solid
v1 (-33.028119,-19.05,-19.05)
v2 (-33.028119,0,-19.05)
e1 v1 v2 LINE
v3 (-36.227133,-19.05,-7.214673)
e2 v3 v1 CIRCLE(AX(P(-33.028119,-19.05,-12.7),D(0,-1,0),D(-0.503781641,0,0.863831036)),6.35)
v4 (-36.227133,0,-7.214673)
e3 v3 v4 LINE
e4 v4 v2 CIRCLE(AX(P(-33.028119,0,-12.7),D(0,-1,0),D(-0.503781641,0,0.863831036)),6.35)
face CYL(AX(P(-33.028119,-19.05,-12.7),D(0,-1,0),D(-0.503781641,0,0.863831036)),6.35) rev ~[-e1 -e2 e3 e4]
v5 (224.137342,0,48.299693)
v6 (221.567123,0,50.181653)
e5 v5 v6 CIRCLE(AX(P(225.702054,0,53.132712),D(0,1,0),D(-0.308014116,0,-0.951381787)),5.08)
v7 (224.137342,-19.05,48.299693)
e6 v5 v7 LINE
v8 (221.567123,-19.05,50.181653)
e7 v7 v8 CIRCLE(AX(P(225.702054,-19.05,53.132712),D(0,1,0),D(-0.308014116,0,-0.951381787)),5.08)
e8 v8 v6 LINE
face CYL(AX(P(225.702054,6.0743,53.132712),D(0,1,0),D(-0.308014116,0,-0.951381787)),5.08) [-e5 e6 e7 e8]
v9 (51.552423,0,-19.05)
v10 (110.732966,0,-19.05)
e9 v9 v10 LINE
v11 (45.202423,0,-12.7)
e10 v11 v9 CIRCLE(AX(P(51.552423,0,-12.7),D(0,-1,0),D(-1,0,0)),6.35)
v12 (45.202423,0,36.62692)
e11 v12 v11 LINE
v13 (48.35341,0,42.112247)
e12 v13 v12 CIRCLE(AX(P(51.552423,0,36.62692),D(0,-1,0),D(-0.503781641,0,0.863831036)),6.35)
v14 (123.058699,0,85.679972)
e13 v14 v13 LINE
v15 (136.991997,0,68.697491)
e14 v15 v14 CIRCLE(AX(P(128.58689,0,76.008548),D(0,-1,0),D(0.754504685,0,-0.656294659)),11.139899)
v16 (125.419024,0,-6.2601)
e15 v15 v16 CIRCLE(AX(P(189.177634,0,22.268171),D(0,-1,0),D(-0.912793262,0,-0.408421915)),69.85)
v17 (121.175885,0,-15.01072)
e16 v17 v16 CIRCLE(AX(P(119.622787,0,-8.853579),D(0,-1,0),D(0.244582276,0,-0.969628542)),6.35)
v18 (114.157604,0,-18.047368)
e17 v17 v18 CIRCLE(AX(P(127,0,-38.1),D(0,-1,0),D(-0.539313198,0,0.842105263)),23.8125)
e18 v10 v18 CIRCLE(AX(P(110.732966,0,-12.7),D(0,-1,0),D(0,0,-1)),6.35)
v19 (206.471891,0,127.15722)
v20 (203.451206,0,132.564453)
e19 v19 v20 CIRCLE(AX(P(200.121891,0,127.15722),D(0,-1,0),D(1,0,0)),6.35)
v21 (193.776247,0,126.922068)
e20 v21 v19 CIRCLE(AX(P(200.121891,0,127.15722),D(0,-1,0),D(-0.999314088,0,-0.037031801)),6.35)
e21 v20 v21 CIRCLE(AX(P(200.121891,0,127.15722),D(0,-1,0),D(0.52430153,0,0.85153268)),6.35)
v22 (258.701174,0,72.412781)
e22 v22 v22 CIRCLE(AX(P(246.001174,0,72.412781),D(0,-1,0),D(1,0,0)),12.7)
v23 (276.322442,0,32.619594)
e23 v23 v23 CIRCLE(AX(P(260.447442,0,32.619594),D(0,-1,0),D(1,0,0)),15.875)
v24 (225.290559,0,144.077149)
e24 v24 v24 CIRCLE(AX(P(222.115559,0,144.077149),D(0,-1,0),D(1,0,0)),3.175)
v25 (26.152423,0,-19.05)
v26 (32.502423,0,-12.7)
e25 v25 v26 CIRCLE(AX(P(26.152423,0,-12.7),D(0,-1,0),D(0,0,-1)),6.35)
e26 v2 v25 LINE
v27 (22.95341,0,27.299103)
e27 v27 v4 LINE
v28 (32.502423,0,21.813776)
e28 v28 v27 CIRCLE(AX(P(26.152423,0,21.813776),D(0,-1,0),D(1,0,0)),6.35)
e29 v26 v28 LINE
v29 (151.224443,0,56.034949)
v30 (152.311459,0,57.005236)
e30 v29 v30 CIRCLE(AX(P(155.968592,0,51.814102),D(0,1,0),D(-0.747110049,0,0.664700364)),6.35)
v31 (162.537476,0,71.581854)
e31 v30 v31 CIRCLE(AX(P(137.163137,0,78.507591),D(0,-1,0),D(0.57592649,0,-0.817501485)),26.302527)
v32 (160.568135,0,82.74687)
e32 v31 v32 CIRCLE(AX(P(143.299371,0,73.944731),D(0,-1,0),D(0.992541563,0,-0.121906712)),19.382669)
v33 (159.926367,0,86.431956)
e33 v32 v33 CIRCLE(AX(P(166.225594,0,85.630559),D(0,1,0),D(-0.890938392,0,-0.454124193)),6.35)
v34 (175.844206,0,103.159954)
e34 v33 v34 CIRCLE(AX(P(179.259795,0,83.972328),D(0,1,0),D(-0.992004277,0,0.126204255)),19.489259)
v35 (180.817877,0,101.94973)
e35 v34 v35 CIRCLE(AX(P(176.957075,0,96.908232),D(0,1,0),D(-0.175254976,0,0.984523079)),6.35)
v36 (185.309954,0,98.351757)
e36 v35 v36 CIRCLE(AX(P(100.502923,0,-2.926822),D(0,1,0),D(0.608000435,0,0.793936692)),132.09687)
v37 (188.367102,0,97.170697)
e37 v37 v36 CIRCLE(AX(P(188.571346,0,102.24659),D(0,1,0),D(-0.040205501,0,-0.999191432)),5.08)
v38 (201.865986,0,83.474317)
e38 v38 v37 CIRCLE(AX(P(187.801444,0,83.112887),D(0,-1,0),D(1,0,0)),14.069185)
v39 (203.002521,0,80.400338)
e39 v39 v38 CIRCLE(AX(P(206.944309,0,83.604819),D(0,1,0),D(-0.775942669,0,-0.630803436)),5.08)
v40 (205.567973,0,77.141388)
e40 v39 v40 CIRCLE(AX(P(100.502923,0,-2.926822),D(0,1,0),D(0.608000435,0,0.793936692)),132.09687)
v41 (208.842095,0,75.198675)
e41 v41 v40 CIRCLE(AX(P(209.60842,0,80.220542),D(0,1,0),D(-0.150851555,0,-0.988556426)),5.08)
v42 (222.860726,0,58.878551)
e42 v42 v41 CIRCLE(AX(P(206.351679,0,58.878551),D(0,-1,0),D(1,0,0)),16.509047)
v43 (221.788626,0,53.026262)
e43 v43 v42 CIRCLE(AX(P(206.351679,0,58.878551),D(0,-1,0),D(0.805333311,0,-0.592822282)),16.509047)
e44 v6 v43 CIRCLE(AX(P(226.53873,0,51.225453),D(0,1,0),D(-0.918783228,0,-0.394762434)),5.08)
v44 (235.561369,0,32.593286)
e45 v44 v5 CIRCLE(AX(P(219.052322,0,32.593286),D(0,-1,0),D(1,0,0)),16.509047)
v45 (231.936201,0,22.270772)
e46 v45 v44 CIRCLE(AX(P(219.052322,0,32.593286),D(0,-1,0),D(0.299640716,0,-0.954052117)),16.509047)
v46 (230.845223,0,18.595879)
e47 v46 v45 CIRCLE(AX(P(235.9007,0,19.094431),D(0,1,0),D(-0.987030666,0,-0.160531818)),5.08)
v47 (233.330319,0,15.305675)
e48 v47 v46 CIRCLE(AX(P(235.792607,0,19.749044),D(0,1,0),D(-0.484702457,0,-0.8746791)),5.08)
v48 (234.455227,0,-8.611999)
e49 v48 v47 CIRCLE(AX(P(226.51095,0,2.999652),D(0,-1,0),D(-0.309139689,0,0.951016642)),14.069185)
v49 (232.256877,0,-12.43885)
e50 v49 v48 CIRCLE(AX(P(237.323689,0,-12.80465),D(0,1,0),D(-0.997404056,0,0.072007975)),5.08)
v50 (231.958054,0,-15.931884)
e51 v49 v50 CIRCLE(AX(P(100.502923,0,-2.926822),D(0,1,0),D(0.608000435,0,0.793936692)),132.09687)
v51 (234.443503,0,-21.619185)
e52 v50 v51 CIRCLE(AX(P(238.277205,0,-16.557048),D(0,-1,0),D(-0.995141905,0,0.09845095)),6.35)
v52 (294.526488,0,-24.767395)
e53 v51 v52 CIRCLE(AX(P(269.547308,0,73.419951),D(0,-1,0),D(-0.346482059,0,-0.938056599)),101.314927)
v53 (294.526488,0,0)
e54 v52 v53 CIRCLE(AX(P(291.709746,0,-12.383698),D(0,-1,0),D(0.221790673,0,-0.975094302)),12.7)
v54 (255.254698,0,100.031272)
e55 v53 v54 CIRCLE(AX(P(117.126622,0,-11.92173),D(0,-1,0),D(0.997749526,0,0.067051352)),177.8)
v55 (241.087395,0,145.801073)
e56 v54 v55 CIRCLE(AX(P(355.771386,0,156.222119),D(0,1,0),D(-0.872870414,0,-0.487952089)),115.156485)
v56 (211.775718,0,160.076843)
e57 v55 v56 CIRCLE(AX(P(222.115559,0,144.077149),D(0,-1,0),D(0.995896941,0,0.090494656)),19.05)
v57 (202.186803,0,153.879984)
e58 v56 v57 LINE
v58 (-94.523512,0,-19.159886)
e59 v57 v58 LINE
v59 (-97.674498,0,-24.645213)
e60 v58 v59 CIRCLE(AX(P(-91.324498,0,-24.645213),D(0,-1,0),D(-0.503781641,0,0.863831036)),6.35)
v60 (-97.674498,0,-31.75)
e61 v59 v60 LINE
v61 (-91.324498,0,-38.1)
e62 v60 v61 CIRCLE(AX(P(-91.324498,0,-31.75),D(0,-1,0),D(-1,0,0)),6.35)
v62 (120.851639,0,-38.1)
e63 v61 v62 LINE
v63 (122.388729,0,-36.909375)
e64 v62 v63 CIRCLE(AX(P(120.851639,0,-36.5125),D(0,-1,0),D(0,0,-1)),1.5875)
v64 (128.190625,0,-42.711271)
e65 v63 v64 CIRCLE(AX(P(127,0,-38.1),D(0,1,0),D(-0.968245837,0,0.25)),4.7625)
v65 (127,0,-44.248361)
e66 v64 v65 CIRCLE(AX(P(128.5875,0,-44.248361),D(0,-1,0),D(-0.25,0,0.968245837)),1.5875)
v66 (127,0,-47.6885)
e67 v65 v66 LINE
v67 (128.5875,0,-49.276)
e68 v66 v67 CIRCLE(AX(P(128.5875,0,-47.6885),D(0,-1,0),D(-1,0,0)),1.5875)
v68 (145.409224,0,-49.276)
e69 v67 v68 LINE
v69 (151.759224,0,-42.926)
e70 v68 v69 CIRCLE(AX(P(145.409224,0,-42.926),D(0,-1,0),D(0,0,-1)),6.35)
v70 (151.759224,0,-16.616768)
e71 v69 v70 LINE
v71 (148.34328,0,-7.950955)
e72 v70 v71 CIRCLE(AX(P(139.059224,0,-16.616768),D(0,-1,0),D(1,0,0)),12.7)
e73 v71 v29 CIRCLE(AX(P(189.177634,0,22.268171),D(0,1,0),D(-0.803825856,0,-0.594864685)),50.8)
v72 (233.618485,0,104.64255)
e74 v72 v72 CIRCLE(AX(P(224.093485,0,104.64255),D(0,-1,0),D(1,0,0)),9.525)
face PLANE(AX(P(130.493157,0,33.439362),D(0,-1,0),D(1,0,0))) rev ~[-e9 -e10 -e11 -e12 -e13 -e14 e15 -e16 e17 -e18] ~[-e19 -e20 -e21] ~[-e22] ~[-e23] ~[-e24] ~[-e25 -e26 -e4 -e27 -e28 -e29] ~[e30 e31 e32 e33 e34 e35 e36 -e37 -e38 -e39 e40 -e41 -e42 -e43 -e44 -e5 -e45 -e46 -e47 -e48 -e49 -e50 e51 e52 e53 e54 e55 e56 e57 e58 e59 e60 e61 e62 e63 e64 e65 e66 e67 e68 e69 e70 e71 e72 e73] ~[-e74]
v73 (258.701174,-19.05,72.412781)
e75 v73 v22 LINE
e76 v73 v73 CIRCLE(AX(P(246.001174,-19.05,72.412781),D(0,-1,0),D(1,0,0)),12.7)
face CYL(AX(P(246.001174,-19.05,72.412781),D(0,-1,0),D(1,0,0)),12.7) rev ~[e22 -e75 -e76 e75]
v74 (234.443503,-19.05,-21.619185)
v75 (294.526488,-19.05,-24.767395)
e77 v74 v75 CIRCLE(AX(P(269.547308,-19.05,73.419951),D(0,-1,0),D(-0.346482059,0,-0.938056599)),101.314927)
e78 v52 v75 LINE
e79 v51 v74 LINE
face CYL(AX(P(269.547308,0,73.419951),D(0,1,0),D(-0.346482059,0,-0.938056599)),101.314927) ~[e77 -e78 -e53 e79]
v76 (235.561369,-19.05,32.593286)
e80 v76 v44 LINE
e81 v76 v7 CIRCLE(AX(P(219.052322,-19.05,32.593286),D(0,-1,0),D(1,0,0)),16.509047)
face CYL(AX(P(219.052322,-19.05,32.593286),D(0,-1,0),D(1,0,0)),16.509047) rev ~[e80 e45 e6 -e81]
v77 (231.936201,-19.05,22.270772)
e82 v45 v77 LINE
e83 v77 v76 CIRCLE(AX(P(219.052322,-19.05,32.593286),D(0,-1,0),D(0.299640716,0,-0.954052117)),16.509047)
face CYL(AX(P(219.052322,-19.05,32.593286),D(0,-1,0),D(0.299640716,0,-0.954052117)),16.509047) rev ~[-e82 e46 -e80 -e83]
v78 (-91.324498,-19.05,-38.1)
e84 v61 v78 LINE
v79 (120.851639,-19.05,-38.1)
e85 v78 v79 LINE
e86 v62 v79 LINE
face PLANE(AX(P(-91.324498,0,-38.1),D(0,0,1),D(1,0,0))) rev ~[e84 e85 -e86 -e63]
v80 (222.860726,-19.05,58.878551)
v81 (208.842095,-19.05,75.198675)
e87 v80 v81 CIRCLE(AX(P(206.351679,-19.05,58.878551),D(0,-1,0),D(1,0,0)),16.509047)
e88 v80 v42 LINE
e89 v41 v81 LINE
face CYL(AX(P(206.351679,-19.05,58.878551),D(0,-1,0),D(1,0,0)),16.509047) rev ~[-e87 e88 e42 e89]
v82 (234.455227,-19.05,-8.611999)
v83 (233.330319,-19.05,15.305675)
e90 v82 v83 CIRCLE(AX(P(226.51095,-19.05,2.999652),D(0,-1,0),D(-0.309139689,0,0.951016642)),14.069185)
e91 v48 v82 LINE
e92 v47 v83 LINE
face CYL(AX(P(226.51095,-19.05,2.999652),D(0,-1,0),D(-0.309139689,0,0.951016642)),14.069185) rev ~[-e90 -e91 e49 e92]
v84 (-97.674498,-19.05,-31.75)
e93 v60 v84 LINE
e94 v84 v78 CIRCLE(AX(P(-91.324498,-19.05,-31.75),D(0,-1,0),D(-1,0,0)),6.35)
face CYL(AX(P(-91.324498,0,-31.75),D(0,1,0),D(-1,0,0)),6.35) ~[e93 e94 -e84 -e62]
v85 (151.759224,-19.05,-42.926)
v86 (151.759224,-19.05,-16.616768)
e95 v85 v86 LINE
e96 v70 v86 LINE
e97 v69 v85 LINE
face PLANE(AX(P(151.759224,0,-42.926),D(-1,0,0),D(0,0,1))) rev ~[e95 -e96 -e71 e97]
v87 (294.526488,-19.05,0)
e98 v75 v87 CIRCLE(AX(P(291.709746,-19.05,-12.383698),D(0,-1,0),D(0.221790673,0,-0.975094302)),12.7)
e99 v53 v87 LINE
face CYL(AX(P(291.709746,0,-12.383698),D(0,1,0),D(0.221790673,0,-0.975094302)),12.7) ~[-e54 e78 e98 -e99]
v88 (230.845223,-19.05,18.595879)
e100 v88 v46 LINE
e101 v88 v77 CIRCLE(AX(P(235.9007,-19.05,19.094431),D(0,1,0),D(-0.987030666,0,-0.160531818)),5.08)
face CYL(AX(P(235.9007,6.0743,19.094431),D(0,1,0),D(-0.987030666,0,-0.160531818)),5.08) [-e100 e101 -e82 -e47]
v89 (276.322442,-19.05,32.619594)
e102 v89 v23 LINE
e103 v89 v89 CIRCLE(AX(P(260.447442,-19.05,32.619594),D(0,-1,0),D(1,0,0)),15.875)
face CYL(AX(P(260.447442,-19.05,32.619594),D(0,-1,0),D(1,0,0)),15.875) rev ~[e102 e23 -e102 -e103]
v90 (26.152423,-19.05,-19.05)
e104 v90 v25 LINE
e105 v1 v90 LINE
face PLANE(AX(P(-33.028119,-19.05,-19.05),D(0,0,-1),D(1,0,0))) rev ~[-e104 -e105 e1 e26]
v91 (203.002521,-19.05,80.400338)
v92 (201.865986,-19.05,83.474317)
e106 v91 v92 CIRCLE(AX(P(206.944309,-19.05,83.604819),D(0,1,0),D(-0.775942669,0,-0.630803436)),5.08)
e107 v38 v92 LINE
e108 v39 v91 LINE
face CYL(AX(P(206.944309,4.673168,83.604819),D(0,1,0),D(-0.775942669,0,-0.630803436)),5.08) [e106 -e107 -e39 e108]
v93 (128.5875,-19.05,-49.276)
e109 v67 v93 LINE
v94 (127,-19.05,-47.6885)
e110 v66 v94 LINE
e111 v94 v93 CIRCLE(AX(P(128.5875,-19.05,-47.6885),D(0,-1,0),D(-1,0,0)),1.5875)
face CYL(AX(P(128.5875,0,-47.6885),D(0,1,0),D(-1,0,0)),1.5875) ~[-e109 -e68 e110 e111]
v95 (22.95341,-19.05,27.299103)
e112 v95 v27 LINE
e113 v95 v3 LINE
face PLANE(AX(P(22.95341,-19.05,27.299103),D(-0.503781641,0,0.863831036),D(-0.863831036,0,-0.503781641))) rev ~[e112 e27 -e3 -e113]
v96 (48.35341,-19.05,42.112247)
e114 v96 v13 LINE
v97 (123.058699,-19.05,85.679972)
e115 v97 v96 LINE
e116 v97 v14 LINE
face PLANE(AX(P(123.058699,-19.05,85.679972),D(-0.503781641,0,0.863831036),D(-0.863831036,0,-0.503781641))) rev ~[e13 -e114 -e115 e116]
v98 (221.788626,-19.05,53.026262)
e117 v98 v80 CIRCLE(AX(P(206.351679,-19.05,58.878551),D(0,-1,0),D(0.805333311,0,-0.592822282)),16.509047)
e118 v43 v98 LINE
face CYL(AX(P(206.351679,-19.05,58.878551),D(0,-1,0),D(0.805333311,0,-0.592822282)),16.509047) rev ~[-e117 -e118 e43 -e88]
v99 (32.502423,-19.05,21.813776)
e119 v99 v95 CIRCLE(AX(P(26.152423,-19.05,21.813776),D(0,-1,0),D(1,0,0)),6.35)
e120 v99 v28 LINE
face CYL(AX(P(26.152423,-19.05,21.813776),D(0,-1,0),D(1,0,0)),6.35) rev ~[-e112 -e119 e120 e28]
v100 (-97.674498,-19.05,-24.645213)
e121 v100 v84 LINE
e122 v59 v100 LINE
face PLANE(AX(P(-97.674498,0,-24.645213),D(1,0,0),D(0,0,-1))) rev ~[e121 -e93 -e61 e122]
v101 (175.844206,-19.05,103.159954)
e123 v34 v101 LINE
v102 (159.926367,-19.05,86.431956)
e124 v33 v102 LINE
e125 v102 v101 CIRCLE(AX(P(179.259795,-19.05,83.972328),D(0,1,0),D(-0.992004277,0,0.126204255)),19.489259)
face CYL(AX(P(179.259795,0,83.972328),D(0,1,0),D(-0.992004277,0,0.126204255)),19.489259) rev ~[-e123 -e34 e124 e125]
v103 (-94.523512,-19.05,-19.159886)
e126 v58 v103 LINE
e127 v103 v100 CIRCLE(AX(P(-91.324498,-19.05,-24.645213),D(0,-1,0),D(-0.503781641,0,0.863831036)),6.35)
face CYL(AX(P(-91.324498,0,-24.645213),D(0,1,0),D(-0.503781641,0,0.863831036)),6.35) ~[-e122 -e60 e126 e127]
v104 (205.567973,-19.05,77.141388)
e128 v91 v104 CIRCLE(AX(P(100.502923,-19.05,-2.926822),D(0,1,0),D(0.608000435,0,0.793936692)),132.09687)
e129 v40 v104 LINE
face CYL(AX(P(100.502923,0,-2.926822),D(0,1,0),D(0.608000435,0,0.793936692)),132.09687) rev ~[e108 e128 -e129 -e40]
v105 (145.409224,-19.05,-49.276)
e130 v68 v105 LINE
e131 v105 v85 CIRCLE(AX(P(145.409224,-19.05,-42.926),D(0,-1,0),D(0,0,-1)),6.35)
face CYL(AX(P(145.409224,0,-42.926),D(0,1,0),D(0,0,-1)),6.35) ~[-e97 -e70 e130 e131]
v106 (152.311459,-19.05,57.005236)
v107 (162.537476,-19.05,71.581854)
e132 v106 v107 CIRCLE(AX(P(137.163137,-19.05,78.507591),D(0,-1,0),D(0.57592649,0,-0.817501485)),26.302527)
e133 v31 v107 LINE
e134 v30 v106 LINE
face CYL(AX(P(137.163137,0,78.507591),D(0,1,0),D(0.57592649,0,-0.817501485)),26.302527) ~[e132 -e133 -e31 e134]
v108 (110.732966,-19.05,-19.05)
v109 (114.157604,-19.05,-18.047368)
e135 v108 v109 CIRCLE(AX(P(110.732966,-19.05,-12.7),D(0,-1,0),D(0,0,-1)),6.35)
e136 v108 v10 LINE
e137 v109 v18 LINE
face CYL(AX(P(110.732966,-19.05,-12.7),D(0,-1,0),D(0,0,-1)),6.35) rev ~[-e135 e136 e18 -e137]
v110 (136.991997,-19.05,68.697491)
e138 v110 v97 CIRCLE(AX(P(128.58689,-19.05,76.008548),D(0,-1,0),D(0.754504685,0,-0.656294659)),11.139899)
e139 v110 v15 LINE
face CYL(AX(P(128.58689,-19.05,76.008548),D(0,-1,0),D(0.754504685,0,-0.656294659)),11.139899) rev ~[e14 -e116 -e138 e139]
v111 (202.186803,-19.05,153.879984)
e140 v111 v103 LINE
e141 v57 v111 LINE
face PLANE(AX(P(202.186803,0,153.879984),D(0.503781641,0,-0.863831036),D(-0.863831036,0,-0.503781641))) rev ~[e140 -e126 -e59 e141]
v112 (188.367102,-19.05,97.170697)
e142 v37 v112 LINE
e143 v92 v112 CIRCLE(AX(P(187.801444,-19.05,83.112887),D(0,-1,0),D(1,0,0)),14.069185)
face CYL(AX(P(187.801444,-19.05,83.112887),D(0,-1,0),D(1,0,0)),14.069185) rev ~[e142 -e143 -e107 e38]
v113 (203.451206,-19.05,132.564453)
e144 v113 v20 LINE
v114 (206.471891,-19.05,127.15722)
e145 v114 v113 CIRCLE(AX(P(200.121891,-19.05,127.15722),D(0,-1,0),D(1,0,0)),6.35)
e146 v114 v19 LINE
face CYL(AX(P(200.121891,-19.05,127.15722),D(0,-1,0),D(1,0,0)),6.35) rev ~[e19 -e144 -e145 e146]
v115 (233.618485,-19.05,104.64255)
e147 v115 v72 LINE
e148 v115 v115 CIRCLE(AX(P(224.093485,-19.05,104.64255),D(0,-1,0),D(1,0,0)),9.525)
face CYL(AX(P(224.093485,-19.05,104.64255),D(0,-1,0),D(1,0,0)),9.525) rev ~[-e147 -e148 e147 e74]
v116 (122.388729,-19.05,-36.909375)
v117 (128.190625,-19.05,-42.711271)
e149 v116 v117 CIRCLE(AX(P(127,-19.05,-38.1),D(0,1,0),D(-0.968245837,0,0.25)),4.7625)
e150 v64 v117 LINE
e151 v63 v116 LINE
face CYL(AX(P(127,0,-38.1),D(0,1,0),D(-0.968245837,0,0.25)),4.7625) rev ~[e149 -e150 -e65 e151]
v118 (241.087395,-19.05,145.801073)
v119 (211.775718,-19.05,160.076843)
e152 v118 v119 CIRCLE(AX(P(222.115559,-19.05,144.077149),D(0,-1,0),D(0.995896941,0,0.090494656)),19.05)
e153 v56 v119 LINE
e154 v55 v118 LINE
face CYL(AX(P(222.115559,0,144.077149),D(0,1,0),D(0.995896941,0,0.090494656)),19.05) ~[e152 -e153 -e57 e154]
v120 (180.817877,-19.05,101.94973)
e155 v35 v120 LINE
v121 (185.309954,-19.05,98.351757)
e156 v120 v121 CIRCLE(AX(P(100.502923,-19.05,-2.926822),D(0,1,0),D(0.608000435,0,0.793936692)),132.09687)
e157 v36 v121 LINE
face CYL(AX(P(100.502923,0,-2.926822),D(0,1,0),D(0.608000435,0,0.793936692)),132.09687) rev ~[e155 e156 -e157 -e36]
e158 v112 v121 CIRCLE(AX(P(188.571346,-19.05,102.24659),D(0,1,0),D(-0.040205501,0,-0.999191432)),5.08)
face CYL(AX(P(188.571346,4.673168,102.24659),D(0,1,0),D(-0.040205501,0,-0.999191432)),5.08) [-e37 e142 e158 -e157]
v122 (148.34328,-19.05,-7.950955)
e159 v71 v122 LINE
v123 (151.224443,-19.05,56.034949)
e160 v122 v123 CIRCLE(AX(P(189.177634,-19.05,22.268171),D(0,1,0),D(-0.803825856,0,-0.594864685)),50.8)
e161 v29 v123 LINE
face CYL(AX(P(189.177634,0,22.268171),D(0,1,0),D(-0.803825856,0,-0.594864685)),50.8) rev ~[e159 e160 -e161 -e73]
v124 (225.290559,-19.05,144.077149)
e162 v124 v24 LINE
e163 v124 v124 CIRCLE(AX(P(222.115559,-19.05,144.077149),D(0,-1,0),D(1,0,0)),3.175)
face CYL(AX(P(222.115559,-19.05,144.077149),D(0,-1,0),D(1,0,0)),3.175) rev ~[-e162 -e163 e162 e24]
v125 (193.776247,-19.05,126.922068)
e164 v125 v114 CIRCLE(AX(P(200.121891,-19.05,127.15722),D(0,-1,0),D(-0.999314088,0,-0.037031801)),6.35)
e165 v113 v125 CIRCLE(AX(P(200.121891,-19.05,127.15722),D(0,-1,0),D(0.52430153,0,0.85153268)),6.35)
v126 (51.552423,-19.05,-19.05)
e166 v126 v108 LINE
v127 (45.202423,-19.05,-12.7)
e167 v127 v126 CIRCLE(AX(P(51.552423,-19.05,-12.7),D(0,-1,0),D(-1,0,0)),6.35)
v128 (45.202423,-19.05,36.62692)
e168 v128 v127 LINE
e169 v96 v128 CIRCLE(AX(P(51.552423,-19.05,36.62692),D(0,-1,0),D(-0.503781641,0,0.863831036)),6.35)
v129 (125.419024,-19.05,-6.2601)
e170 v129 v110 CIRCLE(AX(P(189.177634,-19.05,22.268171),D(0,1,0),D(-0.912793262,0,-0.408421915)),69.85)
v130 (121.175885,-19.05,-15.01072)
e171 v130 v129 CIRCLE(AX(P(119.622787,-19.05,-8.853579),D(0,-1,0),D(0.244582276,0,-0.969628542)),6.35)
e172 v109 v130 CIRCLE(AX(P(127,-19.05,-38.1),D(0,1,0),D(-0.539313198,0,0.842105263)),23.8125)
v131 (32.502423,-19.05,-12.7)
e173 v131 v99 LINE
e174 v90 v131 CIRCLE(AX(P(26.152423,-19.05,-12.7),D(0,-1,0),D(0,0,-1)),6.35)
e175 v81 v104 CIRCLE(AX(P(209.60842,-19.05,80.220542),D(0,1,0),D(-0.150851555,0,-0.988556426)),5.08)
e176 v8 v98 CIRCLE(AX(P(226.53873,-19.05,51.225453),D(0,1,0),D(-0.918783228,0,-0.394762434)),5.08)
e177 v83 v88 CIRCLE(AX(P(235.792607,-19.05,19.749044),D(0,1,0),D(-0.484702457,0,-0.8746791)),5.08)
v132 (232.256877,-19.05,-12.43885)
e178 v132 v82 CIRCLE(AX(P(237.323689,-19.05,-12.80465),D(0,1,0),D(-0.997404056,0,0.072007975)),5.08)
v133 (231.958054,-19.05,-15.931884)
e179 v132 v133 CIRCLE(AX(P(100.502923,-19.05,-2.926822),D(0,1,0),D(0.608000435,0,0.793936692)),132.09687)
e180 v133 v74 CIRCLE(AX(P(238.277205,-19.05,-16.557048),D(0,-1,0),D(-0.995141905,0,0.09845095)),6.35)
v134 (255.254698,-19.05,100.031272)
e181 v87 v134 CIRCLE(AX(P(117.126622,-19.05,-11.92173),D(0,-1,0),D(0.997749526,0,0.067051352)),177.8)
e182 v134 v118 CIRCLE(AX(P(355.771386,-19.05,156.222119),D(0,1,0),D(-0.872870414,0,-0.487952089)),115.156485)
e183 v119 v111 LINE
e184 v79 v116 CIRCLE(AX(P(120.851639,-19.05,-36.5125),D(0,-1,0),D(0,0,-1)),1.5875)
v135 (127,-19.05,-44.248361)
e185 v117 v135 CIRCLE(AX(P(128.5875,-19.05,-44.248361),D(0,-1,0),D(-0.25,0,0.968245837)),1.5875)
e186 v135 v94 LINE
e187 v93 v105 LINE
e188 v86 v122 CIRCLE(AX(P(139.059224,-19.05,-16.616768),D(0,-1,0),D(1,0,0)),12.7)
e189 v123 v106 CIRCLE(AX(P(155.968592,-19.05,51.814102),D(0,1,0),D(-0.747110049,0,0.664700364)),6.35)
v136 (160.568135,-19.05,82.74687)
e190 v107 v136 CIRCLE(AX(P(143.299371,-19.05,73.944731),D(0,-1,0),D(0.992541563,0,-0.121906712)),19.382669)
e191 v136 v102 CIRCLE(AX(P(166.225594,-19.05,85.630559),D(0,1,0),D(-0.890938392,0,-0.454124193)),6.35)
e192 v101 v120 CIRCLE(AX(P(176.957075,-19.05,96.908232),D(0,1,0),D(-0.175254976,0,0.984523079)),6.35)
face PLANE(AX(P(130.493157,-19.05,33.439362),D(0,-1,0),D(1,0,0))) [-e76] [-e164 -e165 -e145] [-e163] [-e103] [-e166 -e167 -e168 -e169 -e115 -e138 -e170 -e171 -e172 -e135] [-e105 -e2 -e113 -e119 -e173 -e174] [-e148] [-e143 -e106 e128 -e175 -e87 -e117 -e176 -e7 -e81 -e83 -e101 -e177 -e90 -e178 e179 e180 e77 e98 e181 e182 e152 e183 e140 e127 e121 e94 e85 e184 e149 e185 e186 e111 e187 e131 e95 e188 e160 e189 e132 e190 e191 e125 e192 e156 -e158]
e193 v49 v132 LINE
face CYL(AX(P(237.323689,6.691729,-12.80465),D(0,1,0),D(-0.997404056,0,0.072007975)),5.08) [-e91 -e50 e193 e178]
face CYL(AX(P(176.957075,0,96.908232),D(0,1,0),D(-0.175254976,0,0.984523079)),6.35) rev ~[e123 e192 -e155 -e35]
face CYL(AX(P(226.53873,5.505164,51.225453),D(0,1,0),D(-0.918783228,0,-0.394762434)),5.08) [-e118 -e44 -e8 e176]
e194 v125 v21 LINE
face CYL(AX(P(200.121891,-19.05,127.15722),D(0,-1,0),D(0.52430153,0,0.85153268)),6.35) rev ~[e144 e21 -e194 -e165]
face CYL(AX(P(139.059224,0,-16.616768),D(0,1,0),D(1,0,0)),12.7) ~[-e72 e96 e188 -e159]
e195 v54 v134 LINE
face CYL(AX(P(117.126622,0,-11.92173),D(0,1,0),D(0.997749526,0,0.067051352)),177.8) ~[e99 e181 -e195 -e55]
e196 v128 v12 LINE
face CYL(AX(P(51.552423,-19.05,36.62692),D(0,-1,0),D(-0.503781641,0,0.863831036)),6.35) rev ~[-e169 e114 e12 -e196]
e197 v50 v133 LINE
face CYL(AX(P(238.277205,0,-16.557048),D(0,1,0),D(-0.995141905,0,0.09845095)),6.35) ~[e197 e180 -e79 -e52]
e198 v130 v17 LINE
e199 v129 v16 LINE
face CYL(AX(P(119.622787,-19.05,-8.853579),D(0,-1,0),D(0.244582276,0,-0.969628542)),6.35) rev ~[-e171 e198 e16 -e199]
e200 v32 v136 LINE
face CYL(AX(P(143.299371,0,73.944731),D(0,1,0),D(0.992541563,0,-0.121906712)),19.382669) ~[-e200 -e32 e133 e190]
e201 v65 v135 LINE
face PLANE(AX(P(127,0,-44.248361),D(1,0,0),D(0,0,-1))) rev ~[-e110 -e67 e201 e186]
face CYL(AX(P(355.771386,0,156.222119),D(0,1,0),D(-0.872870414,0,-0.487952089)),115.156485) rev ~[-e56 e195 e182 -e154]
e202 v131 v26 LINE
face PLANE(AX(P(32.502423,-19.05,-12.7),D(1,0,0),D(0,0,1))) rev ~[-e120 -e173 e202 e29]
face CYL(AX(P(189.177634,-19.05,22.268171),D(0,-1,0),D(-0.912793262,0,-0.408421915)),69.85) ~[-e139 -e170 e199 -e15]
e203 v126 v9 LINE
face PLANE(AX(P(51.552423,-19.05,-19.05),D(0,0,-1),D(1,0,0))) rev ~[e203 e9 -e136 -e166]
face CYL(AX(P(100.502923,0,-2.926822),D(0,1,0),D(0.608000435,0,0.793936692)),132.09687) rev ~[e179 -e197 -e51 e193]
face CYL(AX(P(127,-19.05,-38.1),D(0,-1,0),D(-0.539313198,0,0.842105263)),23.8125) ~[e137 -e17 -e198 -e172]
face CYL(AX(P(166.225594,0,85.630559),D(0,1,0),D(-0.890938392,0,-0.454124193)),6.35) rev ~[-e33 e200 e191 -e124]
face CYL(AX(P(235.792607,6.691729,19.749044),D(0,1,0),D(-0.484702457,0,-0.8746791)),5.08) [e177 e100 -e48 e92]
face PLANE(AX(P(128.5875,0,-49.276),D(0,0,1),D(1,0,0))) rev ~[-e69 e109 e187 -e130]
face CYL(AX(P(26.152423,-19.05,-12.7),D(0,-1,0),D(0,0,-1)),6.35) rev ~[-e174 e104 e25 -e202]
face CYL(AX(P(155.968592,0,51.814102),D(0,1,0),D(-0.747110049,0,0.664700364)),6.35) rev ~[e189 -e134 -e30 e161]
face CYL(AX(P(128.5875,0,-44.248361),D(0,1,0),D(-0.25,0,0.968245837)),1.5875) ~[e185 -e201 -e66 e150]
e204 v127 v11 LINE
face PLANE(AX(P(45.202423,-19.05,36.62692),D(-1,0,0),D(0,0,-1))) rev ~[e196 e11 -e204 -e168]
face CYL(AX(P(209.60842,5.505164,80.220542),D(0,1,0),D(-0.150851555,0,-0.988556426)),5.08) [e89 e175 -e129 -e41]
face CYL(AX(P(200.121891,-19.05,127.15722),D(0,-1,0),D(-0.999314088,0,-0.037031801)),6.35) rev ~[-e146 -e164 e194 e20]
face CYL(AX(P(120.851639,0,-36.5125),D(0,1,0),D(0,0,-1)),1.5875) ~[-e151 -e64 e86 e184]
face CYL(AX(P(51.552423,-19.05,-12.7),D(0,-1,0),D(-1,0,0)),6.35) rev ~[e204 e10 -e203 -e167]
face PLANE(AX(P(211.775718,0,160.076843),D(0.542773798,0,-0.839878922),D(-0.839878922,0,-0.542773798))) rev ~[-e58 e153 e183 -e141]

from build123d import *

# Parameters (mm, degrees)
F1_DEPTH    = 19.05
F2_R        = 3.175
F2_R_2      = 9.525
F2_R_3      = 12.7
F2_R_4      = 15.875
F3_DEPTH    = 25.4
F5_DEPTH    = 25.4
F6_T1_DEPTH = 30.0603271211
F6_T3_DEPTH = 31.1986000008
F6_T5_DEPTH = 28.3963352446
F6_T7_DEPTH = 32.4334586234


# Not quite as in the source:
# - a fillet or chamfer that OpenCascade refuses, or shapes differently, is made with other operations: its cross-section is extruded or revolved along the edge and cut away or added


with BuildPart() as f1:
    # F0 (on Front) → F1 (new body)
    with BuildSketch(Plane.XZ):
        with BuildLine():
            ThreePointArc((-97.6744983316, -31.75), (-95.8146263921, -36.2401280605), (-91.3244983316, -38.1))
            Line((-91.3244983316, -38.1), (120.8516389379, -38.1))
            ThreePointArc((120.8516389379, -38.1), (121.8237801796, -37.7675289464), (122.3887292034, -36.909375))
            ThreePointArc((122.3887292034, -36.909375), (130.3675960454, -34.7324039546), (128.190625, -42.7112707966))
            ThreePointArc((128.190625, -42.7112707966), (127.3324710536, -43.2762198204), (127, -44.2483610621))
            Line((127, -44.2483610621), (127, -47.6885))
            ThreePointArc((127, -47.6885), (127.4649679849, -48.8110320151), (128.5875, -49.276))
            Line((128.5875, -49.276), (145.4092243424, -49.276))
            ThreePointArc((145.4092243424, -49.276), (149.8993524029, -47.4161280605), (151.7592243424, -42.926))
            Line((151.7592243424, -42.926), (151.7592243424, -16.6167677244))
            ThreePointArc((151.7592243424, -16.6167677244), (150.8744160327, -11.9593816205), (148.3432801973, -7.95095519))
            ThreePointArc((148.3432801973, -7.95095519), (138.4290547294, 24.5532823111), (151.2244431733, 56.0349493051))
            ThreePointArc((151.2244431733, 56.0349493051), (151.7400284969, 56.5513745002), (152.3114587754, 57.0052364228))
            ThreePointArc((152.3114587754, 57.0052364228), (158.6954603174, 63.4018980936), (162.5374758377, 71.5818536535))
            ThreePointArc((162.5374758377, 71.5818536535), (162.3873847727, 77.3115690897), (160.5681351866, 82.7468701164))
            ThreePointArc((160.5681351866, 82.7468701164), (159.9697528023, 84.5410858194), (159.9263668127, 86.4319557574))
            ThreePointArc((159.9263668127, 86.4319557574), (165.1411573537, 97.4071817121), (175.8442055157, 103.1599536687))
            ThreePointArc((175.8442055157, 103.1599536687), (178.4583890799, 103.0782041484), (180.8178773791, 101.9497301092))
            ThreePointArc((180.8178773791, 101.9497301092), (221.6873319491, 49.6461946462), (231.9580536588, -15.9318841175))
            ThreePointArc((231.9580536588, -15.9318841175), (232.4585750307, -19.0998901862), (234.443503066, -21.6191846886))
            ThreePointArc((234.443503066, -21.6191846886), (264.2459103293, -27.7561805118), (294.5264875889, -24.767395266))
            ThreePointArc((294.5264875889, -24.767395266), (304.4097460434, -12.383697633), (294.5264875889, 0))
            ThreePointArc((294.5264875889, 0), (282.6289913598, 53.0536935026), (255.2546977003, 100.031271744))
            ThreePointArc((255.2546977003, 100.031271744), (245.7643329114, 122.1712128334), (241.0873952711, 145.8010725364))
            ThreePointArc((241.0873952711, 145.8010725364), (230.45685595, 161.2038903493), (211.7757176902, 160.0768428105))
            Line((211.7757176902, 160.0768428105), (202.1868032782, 153.8799835291))
            Line((202.1868032782, 153.8799835291), (-94.5235117526, -19.159885704))
            ThreePointArc((-94.5235117526, -19.159885704), (-96.8306873596, -21.4822422795), (-97.6744983316, -24.6452127802))
            Line((-97.6744983316, -24.6452127802), (-97.6744983316, -31.75))
        make_face()
    extrude(amount=F1_DEPTH)

    # F2 (on face) → F3 (cut)
    with BuildSketch(Plane.XZ.offset(19.05)):
        with Locations((222.1155585436, 144.0771493407)):
            Circle(F2_R)
        with BuildLine():
            Line((203.4512059186, 132.5644525933), (193.776246746, 126.9220681353))
            ThreePointArc((193.776246746, 126.9220681353), (200.2394873385, 120.8083090531), (206.4718912023, 127.1572200738))
            ThreePointArc((206.4718912023, 127.1572200738), (205.6655203588, 130.254101695), (203.4512059186, 132.5644525933))
        make_face()
        with BuildLine():
            ThreePointArc((203.4512059186, 132.5644525933), (196.9228777813, 132.6425471499), (193.776246746, 126.9220681353))
            Line((193.776246746, 126.9220681353), (203.4512059186, 132.5644525933))
        make_face()
        with Locations((224.0934852203, 104.6425497844)):
            Circle(F2_R_2)
        with Locations((246.0011737906, 72.412781237)):
            Circle(F2_R_3)
        with Locations((260.4474416869, 32.6195944174)):
            Circle(F2_R_4)
        with BuildLine():
            ThreePointArc((-36.2271326674, -7.2146729239), (-39.1581407363, -14.3569057105), (-33.0281192464, -19.05))
            Line((-33.0281192464, -19.05), (26.1524232063, -19.05))
            ThreePointArc((26.1524232063, -19.05), (30.6425512669, -17.1901280605), (32.5024232063, -12.7))
            Line((32.5024232063, -12.7), (32.5024232063, 21.8137759235))
            ThreePointArc((32.5024232063, 21.8137759235), (29.315393707, 27.3199649515), (22.9534097853, 27.2991029996))
            Line((22.9534097853, 27.2991029996), (-36.2271326674, -7.2146729239))
        make_face()
        with BuildLine():
            ThreePointArc((125.4190243086, -6.2600999334), (120.1455601031, 32.9262812272), (136.9919967338, 68.6974912436))
            ThreePointArc((136.9919967338, 68.6974912436), (137.1991099249, 83.0744541178), (123.0586985781, 85.6799721664))
            Line((123.0586985781, 85.6799721664), (48.3534097853, 42.1122471873))
            ThreePointArc((48.3534097853, 42.1122471873), (46.0462341784, 39.7898906118), (45.2024232063, 36.6269201112))
            Line((45.2024232063, 36.6269201112), (45.2024232063, 36.5713226157))
            Line((45.2024232063, 36.5713226157), (45.2024232063, -12.7))
            ThreePointArc((45.2024232063, -12.7), (47.0622951458, -17.1901280605), (51.5524232063, -19.05))
            Line((51.5524232063, -19.05), (110.732965659, -19.05))
            ThreePointArc((110.732965659, -19.05), (112.5171616301, -18.7941894241), (114.1576044677, -18.0473684211))
            ThreePointArc((114.1576044677, -18.0473684211), (117.5440512909, -16.2454766636), (121.1758845472, -15.0107203351))
            ThreePointArc((121.1758845472, -15.0107203351), (125.336500367, -11.6241351048), (125.4190243086, -6.2600999334))
        make_face()
    extrude(amount=-F3_DEPTH, mode=Mode.SUBTRACT)

    # F4 (on face) → F5 (cut)
    with BuildSketch(Plane.XZ.offset(19.05)):
        with BuildLine():
            Line((205.7570372824, 42.3802169454), (212.9491877633, 45.8553555323))
            ThreePointArc((212.9491877633, 45.8553555323), (212.5656514739, 46.730082771), (212.1753107443, 47.6017948463))
            ThreePointArc((212.1753107443, 47.6017948463), (208.6337520482, 45.3996132397), (205.7570372824, 42.3802169454))
        make_face()
        with BuildLine():
            ThreePointArc((212.1753107443, 47.6017948463), (212.5656514739, 46.730082771), (212.9491877633, 45.8553555323))
            Line((212.9491877633, 45.8553555323), (205.7570372824, 42.3802169454))
            ThreePointArc((205.7570372824, 42.3802169454), (213.5341104331, 44.0137836863), (219.6469644258, 49.09162015))
            ThreePointArc((219.6469644258, 49.09162015), (215.8240199222, 48.7836130904), (212.1753107443, 47.6017948463))
        make_face()
        with BuildLine():
            ThreePointArc((205.7570372824, 42.3802169454), (208.6337520482, 45.3996132397), (212.1753107443, 47.6017948463))
            ThreePointArc((212.1753107443, 47.6017948463), (205.3746994644, 60.5221639094), (197.0859881764, 72.5422103192))
            Line((197.0859881764, 72.5422103192), (193.6454970545, 69.4190230989))
            ThreePointArc((193.6454970545, 69.4190230989), (191.2850857199, 52.1297449914), (205.7570372824, 42.3802169454))
        make_face()
        with BuildLine():
            ThreePointArc((197.0859881764, 72.5422103192), (205.3746994644, 60.5221639094), (212.1753107443, 47.6017948463))
            ThreePointArc((212.1753107443, 47.6017948463), (215.8240199222, 48.7836130904), (219.6469644258, 49.09162015))
            ThreePointArc((219.6469644258, 49.09162015), (222.0367215402, 53.7280102211), (222.8607258742, 58.8785508543))
            ThreePointArc((222.8607258742, 58.8785508543), (214.0841075429, 73.4647831759), (197.0859881764, 72.5422103192))
        make_face()
        with BuildLine():
            ThreePointArc((219.6469644258, 49.09162015), (213.5341104331, 44.0137836863), (205.7570372824, 42.3802169454))
            ThreePointArc((205.7570372824, 42.3802169454), (205.0900299154, 23.784029323), (222.1616065465, 16.3796816648))
            ThreePointArc((222.1616065465, 16.3796816648), (223.0725498981, 16.6422099505), (223.9991050166, 16.8427953515))
            ThreePointArc((223.9991050166, 16.8427953515), (232.3605019958, 22.823896366), (235.5613691058, 32.5932862411))
            ThreePointArc((235.5613691058, 32.5932862411), (230.9343591767, 44.0547793603), (219.6469644258, 49.09162015))
        make_face()
        with BuildLine():
            ThreePointArc((195.5812538731, 71.3904075622), (196.3170814503, 71.9879165163), (197.0859881764, 72.5422103192))
            ThreePointArc((197.0859881764, 72.5422103192), (187.8014437334, 83.1128874452), (177.3667262781, 92.5499766177))
            ThreePointArc((177.3667262781, 92.5499766177), (177.1387060987, 73.9342161605), (195.5812538731, 71.3904075622))
        make_face()
        with BuildLine():
            ThreePointArc((177.3667262781, 92.5499766177), (187.8014437334, 83.1128874452), (197.0859881764, 72.5422103192))
            ThreePointArc((197.0859881764, 72.5422103192), (200.6187749377, 77.3113358236), (201.8706292258, 83.1128874452))
            ThreePointArc((201.8706292258, 83.1128874452), (192.8578260854, 96.2420526102), (177.3667262781, 92.5499766177))
        make_face()
        with BuildLine():
            Line((193.6454970545, 69.4190230989), (197.0859881764, 72.5422103192))
            ThreePointArc((197.0859881764, 72.5422103192), (196.3530349145, 71.9409463118), (195.5812538731, 71.3904075622))
            ThreePointArc((195.5812538731, 71.3904075622), (194.5720627472, 70.4452814273), (193.6454970545, 69.4190230989))
        make_face()
        with BuildLine():
            ThreePointArc((195.5812538731, 71.3904075622), (196.3530349145, 71.9409463118), (197.0859881764, 72.5422103192))
            ThreePointArc((197.0859881764, 72.5422103192), (196.3170814503, 71.9879165163), (195.5812538731, 71.3904075622))
        make_face()
        with BuildLine():
            ThreePointArc((223.9991050166, 16.8427953515), (223.0725498981, 16.6422099505), (222.1616065465, 16.3796816648))
            ThreePointArc((222.1616065465, 16.3796816648), (223.0870059682, 16.5848525296), (223.9991050166, 16.8427953515))
        make_face()
        with BuildLine():
            ThreePointArc((223.9991050166, 16.8427953515), (223.0870059682, 16.5848525296), (222.1616065465, 16.3796816648))
            ThreePointArc((222.1616065465, 16.3796816648), (218.2420246677, -8.38309145), (240.5801356684, 2.9996521278))
            ThreePointArc((240.5801356684, 2.9996521278), (235.5276670104, 13.7996890697), (223.9991050166, 16.8427953515))
        make_face()
    extrude(amount=-F5_DEPTH, mode=Mode.SUBTRACT)

    # F6: fillet of radius 5.08 on 8 edges, made by hand

    # F6_s2 → F6_t1 (cut)
    with BuildSketch(Plane.XZ.offset(-5.5051635606)):
        with BuildLine():
            ThreePointArc((221.8713115401, 49.2200601176), (221.4599286068, 51.1151221825), (221.7886262098, 53.0262616419))
            ThreePointArc((221.7886262098, 53.0262616419), (221.4135293391, 52.1191653521), (220.9851854038, 51.2359650268))
            ThreePointArc((220.9851854038, 51.2359650268), (221.432449207, 50.2298590785), (221.8713115401, 49.2200601176))
        make_face()
        with BuildLine():
            ThreePointArc((208.8420945961, 75.1986750012), (207.0161625579, 75.8517204357), (205.5679730948, 77.1413883878))
            ThreePointArc((205.5679730948, 77.1413883878), (206.2316951899, 76.2628856448), (206.8880718736, 75.3788812682))
            ThreePointArc((206.8880718736, 75.3788812682), (207.8677630854, 75.3178364408), (208.8420945961, 75.1986750012))
        make_face()
    extrude(amount=F6_T1_DEPTH, mode=Mode.SUBTRACT)

    # F6_s4 → F6_t3 (cut)
    with BuildSketch(Plane.XZ.offset(-6.0743000004)):
        with BuildLine():
            ThreePointArc((224.1373418719, 48.2996925298), (222.3088529855, 49.3521578516), (221.0656189971, 51.0566883182))
            ThreePointArc((221.0656189971, 51.0566883182), (221.5569923707, 49.9456220571), (222.0381267809, 48.830083753))
            ThreePointArc((222.0381267809, 48.830083753), (223.0964388832, 48.5993395729), (224.1373418719, 48.2996925298))
        make_face()
        with BuildLine():
            ThreePointArc((230.8865844012, 18.2789289832), (230.9876985591, 20.3862568619), (231.9362009526, 22.2707722029))
            ThreePointArc((231.9362009526, 22.2707722029), (231.2315639977, 21.4481215212), (230.4744978403, 20.6734485479))
            ThreePointArc((230.4744978403, 20.6734485479), (230.6860466781, 19.4771362484), (230.8865844012, 18.2789289832))
        make_face()
    extrude(amount=F6_T3_DEPTH, mode=Mode.SUBTRACT)

    # F6_s6 → F6_t5 (cut)
    with BuildSketch(Plane.XZ.offset(-4.6731676223)):
        with BuildLine():
            ThreePointArc((203.002520704, 80.4003376681), (202.1795489166, 81.8431560004), (201.8659860021, 83.4743168145))
            ThreePointArc((201.8659860021, 83.4743168145), (201.8632603647, 82.657592546), (201.8131477205, 81.8424025787))
            ThreePointArc((201.8131477205, 81.8424025787), (202.4103850279, 81.1234739617), (203.002520704, 80.4003376681))
        make_face()
        with BuildLine():
            ThreePointArc((188.3671023799, 97.170697044), (186.7406676624, 97.5079171684), (185.3099539983, 98.3517570313))
            ThreePointArc((185.3099539983, 98.3517570313), (186.0244140953, 97.749181287), (186.7345928658, 97.1415655599))
            ThreePointArc((186.7345928658, 97.1415655599), (187.5504246675, 97.1798334481), (188.3671023799, 97.170697044))
        make_face()
    extrude(amount=F6_T5_DEPTH, mode=Mode.SUBTRACT)

    # F6_s8 → F6_t7 (cut)
    with BuildSketch(Plane.XZ.offset(-6.6917293117)):
        with BuildLine():
            ThreePointArc((232.2568768174, -12.4388497815), (232.9187668001, -10.2742241066), (234.4552271906, -8.6119990526))
            ThreePointArc((234.4552271906, -8.6119990526), (233.4629344096, -9.2319420298), (232.4225614415, -9.767290837))
            ThreePointArc((232.4225614415, -9.767290837), (232.3464860605, -11.1034899805), (232.2568768174, -12.4388497815))
        make_face()
        with BuildLine():
            ThreePointArc((233.3303189509, 15.3056746343), (231.6446289063, 16.816353864), (230.7824945926, 18.9093008502))
            ThreePointArc((230.7824945926, 18.9093008502), (230.9970416723, 17.5882462846), (231.1981934117, 16.2650858285))
            ThreePointArc((231.1981934117, 16.2650858285), (232.284220259, 15.829746943), (233.3303189509, 15.3056746343))
        make_face()
    extrude(amount=F6_T7_DEPTH, mode=Mode.SUBTRACT)


solid = f1.part
